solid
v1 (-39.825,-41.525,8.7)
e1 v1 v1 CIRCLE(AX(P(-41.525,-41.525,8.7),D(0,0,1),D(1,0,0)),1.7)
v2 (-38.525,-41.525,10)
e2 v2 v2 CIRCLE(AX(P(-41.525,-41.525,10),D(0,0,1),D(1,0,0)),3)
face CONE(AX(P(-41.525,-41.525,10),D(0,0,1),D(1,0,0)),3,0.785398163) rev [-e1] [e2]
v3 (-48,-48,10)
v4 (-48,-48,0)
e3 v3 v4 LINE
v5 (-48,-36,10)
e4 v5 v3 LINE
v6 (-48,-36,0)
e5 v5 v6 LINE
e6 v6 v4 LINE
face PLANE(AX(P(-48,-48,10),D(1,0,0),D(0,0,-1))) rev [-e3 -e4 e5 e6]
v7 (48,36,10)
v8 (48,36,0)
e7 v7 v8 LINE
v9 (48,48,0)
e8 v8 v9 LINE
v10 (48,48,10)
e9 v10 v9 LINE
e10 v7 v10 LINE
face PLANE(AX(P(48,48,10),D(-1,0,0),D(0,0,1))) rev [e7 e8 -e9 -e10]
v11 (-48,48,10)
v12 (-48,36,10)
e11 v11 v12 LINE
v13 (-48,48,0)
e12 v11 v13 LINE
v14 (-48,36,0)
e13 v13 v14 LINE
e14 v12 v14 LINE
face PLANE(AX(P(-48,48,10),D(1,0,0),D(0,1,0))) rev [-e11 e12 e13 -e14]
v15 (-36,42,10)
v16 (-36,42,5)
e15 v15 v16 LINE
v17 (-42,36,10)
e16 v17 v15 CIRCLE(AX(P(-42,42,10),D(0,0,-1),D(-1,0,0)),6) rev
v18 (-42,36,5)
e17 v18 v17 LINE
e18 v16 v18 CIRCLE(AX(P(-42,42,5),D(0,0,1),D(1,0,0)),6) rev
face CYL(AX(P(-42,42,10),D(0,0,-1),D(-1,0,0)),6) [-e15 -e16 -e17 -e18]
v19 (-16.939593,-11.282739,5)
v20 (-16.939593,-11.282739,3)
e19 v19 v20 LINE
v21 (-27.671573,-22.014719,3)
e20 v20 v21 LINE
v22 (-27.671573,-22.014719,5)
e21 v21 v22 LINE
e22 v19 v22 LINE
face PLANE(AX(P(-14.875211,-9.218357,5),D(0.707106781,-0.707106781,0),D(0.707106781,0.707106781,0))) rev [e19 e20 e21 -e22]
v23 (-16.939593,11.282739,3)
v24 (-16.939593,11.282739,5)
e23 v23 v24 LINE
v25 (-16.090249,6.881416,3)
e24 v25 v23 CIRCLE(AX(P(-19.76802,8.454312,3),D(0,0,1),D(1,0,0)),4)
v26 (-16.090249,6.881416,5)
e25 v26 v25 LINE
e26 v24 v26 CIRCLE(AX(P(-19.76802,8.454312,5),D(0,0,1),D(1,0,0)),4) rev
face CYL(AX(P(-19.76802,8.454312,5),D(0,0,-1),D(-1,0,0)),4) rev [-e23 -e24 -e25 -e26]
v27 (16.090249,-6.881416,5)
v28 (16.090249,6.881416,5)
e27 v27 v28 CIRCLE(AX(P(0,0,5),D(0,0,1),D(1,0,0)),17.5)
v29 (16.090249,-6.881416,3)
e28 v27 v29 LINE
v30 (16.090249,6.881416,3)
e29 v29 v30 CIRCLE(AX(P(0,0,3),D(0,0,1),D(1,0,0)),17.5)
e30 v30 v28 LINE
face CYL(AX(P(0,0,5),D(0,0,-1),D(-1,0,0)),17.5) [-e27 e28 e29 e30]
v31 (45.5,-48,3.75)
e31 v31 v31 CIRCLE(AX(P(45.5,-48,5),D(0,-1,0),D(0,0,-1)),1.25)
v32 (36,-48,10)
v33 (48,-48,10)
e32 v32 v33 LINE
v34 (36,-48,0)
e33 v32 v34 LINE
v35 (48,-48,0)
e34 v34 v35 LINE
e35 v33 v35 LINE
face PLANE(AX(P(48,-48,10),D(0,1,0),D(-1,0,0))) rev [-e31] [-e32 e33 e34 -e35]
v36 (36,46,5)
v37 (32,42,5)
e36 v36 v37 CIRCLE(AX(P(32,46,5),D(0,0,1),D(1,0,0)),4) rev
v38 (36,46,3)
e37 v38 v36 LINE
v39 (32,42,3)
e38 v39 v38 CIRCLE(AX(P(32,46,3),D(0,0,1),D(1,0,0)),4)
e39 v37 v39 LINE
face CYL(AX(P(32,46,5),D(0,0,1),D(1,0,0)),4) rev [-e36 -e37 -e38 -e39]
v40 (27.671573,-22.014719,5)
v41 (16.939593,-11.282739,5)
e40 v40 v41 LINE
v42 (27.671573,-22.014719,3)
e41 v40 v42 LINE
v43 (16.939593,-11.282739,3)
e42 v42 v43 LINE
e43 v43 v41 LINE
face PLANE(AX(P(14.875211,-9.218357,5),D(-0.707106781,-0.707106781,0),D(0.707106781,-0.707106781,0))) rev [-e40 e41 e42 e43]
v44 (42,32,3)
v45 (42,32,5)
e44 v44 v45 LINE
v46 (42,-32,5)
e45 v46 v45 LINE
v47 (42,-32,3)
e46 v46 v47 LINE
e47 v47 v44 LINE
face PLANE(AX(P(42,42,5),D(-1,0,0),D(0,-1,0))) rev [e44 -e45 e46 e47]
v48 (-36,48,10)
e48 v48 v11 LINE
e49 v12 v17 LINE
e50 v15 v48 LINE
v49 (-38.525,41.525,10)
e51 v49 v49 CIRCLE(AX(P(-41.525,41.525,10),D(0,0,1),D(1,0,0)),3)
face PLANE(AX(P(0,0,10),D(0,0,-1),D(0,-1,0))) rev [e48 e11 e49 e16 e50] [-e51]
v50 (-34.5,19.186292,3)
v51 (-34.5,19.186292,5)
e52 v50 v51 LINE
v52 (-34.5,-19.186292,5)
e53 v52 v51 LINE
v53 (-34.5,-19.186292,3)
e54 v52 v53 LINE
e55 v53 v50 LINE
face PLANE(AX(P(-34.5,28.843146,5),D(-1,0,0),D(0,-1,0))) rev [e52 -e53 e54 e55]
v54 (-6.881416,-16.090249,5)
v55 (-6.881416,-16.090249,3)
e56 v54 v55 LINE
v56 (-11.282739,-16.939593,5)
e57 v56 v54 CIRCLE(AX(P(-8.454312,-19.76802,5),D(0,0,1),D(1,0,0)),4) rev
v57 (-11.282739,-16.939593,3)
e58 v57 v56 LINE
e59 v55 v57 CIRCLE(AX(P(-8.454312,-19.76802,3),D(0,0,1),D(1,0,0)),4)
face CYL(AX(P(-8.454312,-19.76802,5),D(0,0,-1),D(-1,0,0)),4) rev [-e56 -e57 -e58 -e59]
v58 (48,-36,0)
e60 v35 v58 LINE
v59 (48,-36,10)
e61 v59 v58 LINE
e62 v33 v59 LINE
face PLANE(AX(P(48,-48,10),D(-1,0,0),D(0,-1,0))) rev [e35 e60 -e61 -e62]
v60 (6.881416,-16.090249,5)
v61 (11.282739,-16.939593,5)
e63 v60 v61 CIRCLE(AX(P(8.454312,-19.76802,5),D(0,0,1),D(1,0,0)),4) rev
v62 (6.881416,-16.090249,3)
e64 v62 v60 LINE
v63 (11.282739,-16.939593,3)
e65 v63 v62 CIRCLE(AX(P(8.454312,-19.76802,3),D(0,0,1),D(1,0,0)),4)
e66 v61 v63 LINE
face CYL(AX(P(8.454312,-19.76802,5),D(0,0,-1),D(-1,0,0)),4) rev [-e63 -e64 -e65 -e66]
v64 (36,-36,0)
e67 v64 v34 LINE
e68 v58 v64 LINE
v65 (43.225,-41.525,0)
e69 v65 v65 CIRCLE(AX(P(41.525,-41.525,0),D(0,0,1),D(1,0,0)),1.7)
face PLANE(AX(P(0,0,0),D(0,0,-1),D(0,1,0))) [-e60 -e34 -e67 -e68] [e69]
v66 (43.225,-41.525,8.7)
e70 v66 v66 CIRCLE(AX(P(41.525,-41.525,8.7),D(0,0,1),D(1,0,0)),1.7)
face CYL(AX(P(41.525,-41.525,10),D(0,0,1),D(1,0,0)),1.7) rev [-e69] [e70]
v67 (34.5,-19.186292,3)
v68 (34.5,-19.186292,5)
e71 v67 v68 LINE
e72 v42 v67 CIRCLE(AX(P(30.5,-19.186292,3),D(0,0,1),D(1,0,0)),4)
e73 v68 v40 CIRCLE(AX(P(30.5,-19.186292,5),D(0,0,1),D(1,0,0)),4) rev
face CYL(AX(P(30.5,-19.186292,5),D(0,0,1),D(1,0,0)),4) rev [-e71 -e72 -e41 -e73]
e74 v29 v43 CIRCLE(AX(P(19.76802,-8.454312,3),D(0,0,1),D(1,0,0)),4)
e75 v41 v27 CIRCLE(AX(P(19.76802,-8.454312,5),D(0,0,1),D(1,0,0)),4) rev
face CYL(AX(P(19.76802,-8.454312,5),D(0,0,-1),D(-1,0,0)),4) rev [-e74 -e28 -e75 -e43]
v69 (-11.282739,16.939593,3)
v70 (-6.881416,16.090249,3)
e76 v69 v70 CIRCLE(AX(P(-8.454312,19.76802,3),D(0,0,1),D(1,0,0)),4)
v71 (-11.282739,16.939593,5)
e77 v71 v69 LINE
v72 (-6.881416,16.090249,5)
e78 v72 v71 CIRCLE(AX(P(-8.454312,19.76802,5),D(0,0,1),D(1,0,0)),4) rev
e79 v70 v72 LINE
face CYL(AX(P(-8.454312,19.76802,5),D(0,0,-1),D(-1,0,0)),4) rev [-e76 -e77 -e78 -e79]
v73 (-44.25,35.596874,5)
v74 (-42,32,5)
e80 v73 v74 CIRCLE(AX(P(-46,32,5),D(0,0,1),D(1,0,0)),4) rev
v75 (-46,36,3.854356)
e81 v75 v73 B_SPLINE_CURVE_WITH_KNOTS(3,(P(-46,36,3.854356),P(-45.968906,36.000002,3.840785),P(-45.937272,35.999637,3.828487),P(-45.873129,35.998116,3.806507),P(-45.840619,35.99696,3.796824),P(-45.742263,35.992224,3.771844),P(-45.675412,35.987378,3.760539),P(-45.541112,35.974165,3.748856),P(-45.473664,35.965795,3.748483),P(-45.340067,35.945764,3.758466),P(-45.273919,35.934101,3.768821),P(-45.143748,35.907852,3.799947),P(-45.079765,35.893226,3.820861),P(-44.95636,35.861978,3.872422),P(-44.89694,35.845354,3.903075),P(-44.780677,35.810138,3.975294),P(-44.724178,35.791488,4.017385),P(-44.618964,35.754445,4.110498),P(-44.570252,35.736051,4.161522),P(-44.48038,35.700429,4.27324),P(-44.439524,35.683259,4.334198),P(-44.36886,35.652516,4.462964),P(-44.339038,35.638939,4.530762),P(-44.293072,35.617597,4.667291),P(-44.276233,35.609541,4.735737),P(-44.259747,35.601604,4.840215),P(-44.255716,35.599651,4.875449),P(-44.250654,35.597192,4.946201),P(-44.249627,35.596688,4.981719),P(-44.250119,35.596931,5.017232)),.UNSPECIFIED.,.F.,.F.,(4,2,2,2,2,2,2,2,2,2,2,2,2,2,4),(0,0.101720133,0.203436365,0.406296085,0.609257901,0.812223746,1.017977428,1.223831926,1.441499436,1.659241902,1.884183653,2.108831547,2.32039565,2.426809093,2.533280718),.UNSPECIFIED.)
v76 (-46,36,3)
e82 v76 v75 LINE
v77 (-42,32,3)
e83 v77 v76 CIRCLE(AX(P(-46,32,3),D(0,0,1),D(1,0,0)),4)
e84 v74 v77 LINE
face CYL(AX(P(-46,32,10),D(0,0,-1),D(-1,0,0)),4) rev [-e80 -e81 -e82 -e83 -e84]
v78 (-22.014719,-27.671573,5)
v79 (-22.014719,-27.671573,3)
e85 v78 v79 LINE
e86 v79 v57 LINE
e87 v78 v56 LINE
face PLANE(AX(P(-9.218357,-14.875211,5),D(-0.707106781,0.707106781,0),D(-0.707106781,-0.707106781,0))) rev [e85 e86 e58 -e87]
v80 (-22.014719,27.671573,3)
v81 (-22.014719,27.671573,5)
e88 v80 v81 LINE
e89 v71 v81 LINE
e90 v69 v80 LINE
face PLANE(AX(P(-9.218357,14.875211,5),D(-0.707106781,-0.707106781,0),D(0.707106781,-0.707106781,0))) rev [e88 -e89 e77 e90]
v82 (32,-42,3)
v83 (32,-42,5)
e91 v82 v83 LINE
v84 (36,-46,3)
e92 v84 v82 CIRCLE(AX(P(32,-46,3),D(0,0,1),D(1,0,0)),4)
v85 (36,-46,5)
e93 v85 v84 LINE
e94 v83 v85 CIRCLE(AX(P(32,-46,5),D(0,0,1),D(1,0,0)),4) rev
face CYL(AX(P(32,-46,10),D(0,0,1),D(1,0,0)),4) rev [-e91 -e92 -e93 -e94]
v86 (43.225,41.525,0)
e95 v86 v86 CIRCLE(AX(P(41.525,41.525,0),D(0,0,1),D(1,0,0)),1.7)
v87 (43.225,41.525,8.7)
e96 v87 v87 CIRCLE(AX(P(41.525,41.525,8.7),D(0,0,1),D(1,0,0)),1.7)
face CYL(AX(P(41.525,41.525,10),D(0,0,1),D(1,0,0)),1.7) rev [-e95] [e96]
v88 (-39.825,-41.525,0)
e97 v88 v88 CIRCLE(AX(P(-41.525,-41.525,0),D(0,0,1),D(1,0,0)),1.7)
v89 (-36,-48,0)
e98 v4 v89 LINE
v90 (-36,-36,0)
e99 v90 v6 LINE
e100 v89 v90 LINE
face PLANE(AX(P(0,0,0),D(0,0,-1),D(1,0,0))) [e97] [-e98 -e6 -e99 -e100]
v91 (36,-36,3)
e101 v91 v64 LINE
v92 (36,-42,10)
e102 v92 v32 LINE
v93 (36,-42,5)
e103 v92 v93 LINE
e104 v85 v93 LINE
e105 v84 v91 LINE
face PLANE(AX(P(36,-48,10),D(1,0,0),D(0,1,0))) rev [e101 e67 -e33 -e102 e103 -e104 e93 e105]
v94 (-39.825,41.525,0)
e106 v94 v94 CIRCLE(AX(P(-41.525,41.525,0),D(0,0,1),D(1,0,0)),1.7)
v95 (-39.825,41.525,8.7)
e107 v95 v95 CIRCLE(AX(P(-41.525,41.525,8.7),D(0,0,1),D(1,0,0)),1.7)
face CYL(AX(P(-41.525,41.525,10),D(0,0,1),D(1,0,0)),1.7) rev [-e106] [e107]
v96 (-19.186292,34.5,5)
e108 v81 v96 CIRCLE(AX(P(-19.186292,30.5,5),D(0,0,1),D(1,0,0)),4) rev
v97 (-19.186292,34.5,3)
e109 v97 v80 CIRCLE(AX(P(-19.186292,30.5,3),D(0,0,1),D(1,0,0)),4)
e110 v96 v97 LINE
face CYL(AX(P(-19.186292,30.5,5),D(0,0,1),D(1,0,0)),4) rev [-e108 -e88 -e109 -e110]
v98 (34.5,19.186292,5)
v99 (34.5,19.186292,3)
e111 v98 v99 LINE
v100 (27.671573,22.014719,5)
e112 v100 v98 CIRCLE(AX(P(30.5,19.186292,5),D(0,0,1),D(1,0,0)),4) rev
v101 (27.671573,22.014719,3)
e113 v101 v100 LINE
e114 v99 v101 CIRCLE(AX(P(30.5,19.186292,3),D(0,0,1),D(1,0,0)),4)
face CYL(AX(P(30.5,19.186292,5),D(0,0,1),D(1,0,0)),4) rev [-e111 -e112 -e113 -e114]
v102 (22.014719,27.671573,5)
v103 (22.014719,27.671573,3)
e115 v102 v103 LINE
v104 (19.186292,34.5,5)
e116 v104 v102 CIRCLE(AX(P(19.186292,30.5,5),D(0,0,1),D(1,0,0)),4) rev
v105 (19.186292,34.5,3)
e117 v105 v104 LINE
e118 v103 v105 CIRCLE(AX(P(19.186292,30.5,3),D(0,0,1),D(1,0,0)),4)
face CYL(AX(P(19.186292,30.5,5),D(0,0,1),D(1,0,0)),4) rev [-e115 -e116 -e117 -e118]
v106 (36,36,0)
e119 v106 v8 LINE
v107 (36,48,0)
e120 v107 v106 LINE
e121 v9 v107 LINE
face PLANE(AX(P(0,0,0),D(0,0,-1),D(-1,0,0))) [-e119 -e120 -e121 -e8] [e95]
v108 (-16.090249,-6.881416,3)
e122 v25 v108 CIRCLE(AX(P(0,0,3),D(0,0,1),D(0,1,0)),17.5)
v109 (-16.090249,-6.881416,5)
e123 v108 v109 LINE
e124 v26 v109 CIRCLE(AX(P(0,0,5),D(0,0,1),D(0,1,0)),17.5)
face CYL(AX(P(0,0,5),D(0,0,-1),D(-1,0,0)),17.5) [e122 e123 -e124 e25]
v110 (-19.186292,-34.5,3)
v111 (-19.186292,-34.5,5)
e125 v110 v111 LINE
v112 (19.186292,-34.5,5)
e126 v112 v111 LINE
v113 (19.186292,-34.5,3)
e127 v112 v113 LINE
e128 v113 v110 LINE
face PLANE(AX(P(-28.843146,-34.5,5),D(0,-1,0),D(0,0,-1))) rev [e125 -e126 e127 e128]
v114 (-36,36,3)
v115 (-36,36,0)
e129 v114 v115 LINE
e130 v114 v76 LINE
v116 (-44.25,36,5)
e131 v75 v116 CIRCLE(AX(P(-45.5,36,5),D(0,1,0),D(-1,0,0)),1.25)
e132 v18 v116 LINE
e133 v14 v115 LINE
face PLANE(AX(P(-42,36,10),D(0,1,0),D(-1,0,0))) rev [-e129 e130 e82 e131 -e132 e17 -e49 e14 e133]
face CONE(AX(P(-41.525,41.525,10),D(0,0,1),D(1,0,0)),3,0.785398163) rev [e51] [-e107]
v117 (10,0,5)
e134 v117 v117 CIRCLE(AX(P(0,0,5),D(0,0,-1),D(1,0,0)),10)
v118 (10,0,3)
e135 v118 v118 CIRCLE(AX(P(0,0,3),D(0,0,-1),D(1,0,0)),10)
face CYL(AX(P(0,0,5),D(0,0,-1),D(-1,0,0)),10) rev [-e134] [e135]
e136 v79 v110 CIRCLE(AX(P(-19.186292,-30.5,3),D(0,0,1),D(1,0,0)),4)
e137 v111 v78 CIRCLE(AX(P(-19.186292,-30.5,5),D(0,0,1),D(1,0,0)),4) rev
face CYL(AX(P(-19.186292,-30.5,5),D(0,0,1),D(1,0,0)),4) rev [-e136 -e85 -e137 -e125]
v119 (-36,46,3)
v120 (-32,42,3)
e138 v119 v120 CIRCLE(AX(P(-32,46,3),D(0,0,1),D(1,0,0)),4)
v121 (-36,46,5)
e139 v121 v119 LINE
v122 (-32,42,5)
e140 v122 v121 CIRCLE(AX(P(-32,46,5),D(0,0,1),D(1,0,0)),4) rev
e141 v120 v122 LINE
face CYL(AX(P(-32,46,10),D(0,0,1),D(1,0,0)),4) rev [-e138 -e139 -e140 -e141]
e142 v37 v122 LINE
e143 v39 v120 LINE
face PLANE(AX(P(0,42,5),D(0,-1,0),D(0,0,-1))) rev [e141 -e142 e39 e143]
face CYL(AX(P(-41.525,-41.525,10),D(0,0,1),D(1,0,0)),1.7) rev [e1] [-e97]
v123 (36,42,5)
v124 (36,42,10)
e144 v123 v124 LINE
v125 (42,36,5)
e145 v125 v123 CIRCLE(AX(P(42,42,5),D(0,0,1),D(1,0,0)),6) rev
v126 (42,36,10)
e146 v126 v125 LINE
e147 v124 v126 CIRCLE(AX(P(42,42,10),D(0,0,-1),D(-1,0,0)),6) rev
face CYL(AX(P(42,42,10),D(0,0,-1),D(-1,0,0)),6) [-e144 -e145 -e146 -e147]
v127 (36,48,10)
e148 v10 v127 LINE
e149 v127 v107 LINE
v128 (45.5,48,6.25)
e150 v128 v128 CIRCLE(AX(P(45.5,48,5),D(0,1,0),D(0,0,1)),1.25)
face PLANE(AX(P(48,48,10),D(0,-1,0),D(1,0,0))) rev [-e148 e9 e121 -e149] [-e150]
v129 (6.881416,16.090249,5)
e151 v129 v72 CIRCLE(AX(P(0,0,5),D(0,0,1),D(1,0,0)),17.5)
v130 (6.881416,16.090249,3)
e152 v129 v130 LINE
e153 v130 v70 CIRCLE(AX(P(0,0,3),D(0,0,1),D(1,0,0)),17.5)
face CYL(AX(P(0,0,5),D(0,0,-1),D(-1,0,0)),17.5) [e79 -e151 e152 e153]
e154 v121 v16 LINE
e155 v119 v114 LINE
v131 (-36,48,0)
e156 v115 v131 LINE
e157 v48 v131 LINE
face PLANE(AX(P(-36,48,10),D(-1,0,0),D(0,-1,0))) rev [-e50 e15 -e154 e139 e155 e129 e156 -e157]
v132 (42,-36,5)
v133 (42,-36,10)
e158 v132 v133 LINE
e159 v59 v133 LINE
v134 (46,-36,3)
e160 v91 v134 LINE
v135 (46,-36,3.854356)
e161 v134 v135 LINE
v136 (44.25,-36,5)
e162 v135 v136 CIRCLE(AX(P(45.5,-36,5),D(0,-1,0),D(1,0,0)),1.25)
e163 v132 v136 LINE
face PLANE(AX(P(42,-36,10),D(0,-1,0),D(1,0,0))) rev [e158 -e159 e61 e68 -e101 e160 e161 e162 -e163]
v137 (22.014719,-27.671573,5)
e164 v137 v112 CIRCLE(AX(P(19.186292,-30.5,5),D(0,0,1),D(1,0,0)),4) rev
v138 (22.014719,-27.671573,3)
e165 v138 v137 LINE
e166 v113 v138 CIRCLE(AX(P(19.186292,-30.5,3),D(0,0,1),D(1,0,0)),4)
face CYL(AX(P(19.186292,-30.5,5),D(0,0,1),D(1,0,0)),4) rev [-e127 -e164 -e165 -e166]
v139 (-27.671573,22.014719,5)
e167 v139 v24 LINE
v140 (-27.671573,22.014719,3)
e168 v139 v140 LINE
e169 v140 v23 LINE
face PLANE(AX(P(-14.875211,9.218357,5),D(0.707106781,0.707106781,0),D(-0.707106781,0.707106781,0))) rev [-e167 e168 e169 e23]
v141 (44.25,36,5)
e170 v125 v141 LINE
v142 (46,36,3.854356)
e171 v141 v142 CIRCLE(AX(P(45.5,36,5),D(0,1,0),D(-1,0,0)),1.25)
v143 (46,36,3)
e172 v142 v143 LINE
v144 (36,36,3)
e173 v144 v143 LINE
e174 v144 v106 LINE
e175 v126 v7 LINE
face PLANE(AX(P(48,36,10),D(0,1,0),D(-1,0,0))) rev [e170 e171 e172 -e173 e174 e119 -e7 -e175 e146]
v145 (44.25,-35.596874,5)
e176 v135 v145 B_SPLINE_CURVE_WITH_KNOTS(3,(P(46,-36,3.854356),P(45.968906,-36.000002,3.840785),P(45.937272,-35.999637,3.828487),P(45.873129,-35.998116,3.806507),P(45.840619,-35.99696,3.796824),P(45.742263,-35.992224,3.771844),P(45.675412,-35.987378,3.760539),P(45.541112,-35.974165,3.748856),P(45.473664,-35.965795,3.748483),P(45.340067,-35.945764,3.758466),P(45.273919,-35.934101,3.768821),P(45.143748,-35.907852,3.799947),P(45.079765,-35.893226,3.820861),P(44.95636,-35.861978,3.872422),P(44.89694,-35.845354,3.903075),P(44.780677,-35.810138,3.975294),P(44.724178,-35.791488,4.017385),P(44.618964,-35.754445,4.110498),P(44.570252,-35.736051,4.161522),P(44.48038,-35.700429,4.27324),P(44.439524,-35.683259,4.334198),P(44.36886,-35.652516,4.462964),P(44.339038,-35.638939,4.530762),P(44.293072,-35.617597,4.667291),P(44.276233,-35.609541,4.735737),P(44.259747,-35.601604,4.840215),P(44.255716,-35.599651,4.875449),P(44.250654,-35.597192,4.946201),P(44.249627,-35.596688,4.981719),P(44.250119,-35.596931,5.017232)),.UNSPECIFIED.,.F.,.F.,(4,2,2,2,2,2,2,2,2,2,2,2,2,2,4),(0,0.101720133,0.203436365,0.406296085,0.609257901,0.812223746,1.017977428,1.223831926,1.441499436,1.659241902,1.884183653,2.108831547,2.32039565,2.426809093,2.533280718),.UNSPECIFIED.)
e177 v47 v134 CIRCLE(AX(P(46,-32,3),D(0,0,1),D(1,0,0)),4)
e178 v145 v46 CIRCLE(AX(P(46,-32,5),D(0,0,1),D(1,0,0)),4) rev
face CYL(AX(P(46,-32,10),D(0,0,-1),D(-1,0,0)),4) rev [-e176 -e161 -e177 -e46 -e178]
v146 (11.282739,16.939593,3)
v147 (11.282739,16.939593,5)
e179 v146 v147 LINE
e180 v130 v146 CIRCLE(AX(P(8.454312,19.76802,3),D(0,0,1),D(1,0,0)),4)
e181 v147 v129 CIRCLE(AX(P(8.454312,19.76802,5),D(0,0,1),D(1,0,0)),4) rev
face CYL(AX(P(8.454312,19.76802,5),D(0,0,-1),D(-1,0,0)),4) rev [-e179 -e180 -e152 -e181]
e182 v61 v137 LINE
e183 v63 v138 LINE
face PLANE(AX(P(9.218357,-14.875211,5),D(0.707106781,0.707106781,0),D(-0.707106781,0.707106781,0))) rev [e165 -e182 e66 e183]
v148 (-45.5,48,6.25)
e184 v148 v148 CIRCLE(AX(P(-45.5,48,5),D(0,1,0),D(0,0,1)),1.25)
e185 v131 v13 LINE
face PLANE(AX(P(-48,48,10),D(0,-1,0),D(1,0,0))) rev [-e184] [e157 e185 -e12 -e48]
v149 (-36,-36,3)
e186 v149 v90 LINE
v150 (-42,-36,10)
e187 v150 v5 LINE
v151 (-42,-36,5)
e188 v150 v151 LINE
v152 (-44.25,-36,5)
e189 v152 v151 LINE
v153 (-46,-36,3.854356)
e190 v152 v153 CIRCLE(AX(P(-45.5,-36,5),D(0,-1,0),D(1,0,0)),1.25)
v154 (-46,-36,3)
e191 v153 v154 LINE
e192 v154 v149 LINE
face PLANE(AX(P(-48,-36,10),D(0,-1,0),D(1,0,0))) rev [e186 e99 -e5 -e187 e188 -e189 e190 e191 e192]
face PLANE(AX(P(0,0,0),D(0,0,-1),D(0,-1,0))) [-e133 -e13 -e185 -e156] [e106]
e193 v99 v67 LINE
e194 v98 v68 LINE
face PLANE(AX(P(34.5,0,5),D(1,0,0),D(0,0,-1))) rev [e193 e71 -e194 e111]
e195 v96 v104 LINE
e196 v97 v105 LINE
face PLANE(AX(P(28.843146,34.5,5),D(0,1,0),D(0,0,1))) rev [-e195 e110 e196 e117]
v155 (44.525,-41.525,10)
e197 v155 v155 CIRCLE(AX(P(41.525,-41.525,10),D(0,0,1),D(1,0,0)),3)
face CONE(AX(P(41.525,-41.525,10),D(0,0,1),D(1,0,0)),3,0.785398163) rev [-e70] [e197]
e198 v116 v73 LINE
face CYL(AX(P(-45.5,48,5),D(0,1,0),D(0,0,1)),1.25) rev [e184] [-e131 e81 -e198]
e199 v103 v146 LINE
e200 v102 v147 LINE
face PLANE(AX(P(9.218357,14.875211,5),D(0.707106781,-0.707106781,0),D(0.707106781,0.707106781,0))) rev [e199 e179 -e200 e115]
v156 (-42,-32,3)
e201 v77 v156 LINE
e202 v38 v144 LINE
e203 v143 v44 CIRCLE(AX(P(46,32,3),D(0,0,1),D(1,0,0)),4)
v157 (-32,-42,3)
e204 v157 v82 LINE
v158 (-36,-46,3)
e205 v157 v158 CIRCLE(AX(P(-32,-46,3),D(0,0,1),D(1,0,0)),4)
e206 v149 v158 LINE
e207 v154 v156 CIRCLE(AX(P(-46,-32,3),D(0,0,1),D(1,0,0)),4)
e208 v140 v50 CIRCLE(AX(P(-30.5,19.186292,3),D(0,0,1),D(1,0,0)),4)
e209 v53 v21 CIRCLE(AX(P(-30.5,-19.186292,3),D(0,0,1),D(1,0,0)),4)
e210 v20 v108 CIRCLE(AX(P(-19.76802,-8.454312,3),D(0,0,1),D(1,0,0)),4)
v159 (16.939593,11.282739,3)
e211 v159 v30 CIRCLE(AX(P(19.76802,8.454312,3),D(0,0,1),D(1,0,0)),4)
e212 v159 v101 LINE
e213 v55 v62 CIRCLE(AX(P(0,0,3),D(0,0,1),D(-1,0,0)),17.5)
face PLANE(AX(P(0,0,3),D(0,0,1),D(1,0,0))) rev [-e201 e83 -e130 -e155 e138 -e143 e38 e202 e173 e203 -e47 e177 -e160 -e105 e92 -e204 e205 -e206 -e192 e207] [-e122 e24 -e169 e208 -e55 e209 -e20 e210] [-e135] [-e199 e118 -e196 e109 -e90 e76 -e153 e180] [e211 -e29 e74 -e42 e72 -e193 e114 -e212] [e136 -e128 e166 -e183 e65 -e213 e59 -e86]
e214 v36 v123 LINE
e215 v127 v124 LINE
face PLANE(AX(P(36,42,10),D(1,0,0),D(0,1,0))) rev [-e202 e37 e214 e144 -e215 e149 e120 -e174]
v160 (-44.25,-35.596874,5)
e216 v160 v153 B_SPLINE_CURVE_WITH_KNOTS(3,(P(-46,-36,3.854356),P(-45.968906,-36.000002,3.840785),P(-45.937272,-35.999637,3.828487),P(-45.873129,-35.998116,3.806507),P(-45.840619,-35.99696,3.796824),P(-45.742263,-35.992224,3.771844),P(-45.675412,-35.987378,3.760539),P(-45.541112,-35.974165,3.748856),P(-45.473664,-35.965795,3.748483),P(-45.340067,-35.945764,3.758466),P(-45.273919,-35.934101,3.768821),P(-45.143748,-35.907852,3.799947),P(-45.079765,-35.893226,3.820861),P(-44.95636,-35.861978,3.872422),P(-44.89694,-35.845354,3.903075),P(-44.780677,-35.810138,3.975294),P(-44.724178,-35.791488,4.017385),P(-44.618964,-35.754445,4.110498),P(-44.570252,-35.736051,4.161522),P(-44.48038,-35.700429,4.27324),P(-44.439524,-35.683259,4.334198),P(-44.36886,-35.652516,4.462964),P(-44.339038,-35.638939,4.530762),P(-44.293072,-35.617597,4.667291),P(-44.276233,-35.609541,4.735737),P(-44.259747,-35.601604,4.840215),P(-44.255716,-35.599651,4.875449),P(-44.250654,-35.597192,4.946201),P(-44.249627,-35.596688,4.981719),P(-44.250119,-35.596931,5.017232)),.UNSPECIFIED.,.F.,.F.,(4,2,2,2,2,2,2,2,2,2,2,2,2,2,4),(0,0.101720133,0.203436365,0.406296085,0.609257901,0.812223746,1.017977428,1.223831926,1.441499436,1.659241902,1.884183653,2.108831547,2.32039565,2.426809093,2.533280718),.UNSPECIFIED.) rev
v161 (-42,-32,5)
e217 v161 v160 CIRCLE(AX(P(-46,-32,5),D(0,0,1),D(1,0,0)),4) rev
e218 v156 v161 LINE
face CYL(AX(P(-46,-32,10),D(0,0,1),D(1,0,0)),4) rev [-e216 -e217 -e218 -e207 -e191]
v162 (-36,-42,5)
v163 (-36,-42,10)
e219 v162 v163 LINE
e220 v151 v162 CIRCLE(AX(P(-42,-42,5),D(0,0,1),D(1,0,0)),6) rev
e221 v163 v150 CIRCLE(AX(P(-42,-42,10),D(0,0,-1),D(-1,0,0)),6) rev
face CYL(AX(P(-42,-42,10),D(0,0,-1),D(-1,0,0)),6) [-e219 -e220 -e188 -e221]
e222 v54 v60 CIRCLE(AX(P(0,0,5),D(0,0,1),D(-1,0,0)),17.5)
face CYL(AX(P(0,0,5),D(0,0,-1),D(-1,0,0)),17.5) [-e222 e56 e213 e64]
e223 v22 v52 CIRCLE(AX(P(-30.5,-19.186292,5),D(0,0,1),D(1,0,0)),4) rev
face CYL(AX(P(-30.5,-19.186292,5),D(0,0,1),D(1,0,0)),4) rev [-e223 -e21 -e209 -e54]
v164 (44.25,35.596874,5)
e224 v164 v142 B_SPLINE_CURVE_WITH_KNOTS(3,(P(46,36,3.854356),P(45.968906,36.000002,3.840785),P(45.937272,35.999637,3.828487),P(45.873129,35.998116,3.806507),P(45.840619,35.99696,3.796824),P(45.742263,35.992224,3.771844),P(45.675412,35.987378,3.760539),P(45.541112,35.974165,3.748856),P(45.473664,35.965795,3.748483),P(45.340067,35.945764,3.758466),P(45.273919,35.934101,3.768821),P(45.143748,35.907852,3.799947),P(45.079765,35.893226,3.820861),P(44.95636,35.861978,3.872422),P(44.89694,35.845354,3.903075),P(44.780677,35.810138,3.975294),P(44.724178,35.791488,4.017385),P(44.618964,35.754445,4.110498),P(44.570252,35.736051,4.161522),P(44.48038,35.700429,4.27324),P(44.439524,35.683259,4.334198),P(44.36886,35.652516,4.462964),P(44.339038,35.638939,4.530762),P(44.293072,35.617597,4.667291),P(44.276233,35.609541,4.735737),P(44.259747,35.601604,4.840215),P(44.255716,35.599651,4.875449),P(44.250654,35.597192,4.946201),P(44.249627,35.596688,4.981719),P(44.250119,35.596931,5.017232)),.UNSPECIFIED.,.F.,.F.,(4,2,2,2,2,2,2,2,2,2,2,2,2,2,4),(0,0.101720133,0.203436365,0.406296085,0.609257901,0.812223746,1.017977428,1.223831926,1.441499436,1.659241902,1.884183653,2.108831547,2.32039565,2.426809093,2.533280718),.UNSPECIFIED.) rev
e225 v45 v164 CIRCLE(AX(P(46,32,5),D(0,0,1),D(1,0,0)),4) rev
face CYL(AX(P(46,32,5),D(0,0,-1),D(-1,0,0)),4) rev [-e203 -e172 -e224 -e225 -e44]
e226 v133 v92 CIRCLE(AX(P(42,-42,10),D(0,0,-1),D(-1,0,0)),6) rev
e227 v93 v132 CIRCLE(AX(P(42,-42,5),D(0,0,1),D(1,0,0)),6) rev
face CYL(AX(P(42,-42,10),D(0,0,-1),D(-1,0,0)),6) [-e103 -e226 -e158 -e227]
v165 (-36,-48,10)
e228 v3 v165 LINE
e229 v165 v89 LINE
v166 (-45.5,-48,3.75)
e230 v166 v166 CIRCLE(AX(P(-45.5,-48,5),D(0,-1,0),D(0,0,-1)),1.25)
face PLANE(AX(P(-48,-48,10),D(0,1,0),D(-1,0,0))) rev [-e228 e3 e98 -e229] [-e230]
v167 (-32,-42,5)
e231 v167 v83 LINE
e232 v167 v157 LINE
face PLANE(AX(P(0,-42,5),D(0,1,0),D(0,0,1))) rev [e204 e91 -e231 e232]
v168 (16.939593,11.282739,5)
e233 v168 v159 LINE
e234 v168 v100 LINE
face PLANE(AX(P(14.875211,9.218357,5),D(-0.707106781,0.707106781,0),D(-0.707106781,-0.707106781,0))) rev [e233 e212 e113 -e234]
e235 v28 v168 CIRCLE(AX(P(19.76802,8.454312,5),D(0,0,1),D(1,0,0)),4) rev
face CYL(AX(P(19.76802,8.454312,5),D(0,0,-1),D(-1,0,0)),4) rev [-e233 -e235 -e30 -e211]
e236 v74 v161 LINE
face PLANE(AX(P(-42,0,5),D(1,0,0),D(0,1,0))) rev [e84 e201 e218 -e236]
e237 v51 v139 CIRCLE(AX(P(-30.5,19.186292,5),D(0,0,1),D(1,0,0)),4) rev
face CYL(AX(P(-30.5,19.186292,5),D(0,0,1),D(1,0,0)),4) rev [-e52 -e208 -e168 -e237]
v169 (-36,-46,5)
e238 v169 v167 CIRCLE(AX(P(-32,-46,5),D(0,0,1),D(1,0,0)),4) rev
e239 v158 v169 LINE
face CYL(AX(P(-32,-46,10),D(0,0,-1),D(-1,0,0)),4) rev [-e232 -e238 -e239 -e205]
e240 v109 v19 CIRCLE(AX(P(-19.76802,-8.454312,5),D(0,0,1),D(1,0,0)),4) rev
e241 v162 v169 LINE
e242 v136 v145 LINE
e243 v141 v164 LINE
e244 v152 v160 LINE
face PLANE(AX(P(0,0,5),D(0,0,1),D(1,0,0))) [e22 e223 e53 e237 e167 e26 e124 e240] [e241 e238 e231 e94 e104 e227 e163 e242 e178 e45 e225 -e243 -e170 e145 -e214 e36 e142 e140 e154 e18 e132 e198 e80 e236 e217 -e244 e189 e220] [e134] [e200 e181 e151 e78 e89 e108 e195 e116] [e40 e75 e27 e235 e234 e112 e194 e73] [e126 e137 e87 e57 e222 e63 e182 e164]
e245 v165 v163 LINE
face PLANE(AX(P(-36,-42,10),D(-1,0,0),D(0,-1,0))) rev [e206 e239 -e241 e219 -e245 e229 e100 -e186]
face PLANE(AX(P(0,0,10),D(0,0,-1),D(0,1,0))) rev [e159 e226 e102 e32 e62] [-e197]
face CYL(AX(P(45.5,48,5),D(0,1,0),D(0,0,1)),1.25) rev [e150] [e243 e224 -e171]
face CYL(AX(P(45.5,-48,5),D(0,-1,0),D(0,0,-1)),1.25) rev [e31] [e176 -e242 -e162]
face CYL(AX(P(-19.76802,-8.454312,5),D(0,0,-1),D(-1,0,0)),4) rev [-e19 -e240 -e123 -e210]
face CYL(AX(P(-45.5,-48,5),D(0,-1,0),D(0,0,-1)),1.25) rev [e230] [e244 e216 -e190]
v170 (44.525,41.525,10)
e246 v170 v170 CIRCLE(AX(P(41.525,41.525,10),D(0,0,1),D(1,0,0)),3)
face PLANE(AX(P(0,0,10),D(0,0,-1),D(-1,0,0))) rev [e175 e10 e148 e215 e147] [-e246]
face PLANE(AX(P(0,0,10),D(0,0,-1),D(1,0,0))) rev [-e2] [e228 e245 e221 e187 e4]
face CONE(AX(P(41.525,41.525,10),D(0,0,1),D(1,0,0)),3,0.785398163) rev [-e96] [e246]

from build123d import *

# Parameters (mm, degrees)
BOTTOMLAYER_DEPTH              = 10
BOSS_EXTRUDE1_DEPTH            = 2
M3_CLEARANCE_HOLE1_D           = 3.4
M3_CLEARANCE_HOLE1_CSINK_D     = 6
M3_CLEARANCE_HOLE1_CSINK_ANGLE = 90
TAP_DRILL_FOR_M3_TAP1_D        = 2.5
CIRPATTERN2_COUNT              = 4
CIRPATTERN3_OUTLINE_R          = 1.7
CIRPATTERN3_DEPTH              = 8.6999999
CIRPATTERN3_2_OUTLINE_W        = 12
CIRPATTERN3_2_OUTLINE_H        = 12
CIRPATTERN3_2_OUTLINE_R        = 1.7
CIRPATTERN3_2_DEPTH            = 8.6999999
CIRPATTERN3_START              = -48
CIRPATTERN3_3_OUTLINE_W        = 12
CIRPATTERN3_3_OUTLINE_H        = 1.3000001
CIRPATTERN3_3_DEPTH            = 12
CIRPATTERN3_START_2            = 36
CIRPATTERN3_4_OUTLINE_W        = 12
CIRPATTERN3_4_OUTLINE_H        = 1.3000001
CIRPATTERN3_4_DEPTH            = 12
FILLET1_R                      = 4
TAP_DRILL_FOR_M3_TAP2_D        = 2.5
TAP_DRILL_FOR_M3_TAP2_DEPTH    = 12
FILLET2_R                      = 4
FILLET3_R                      = 6


with BuildPart() as part:
    # Sketch3 → BottomLayer (new body)
    with BuildSketch(Plane.XY):
        Polygon((48, 48), (36, 48), (36, 42), (36, 36), (42, 36), (48, 36), align=None)
    extrude(amount=BOTTOMLAYER_DEPTH)

    # Sketch30 → Boss-Extrude1 (add)
    with BuildSketch(Plane.XY.offset(3)):
        with BuildLine():
            Line((0, 42), (42, 42))
            Line((42, 42), (42, 0))
            Line((42, 0), (34.5, 0))
            Line((34.5, 0), (34.5, 28.843145751))
            Line((34.5, 28.843145751), (14.875210928, 9.218356678))
            ThreePointArc((14.875210928, 9.218356678), (16.831015882, 4.792379824), (17.5, 0))
            Line((17.5, 0), (10, 0))
            ThreePointArc((10, 0), (7.071067812, 7.071067812), (0, 10))
            Line((0, 10), (0, 17.5))
            ThreePointArc((0, 17.5), (4.792379824, 16.831015882), (9.218356678, 14.875210928))
            Line((9.218356678, 14.875210928), (28.843145751, 34.5))
            Line((28.843145751, 34.5), (0, 34.5))
            Line((0, 34.5), (0, 42))
        make_face()
    boss_extrude1 = extrude(amount=BOSS_EXTRUDE1_DEPTH)

    # M3 Clearance Hole1 (through all)
    with Locations(Plane.XY.offset(10)):
        with Locations((41.525, 41.525)):
            CounterSinkHole(M3_CLEARANCE_HOLE1_D / 2, M3_CLEARANCE_HOLE1_CSINK_D / 2, counter_sink_angle=M3_CLEARANCE_HOLE1_CSINK_ANGLE)

    # Tap Drill for M3 Tap1 (through all)
    with Locations(Plane(origin=(0, 48, 0), x_dir=(1, 0, 0), z_dir=(0, 1, 0))):
        with Locations((45.5, -5)):
            tap_drill_for_m3_tap1 = Hole(TAP_DRILL_FOR_M3_TAP1_D / 2)

    # CirPattern2: Boss-Extrude1 ×4 about axis
    cirpattern2_axis = Axis((0, 0, 0), (0, 0, 1))
    for i in range(1, CIRPATTERN2_COUNT):
        add(boss_extrude1.rotate(cirpattern2_axis, i * 360 / CIRPATTERN2_COUNT))

    # CirPattern3: read off the stored shape, not the designer's step
    # CirPattern3 outline → CirPattern3 (cut)
    with BuildSketch(Plane.XY):
        with Locations((-41.525, 41.525)):
            Circle(CIRPATTERN3_OUTLINE_R)
        with Locations((-41.525, -41.525)):
            Circle(CIRPATTERN3_OUTLINE_R)
        with Locations((41.525, -41.525)):
            Circle(CIRPATTERN3_OUTLINE_R)
    extrude(amount=CIRPATTERN3_DEPTH, mode=Mode.SUBTRACT)

    # CirPattern3 2 outline → CirPattern3 2 (add)
    # profile 1 of 3: a face of its own
    with BuildSketch(Plane.XY):
        with Locations((-42, 42)):
            Rectangle(CIRPATTERN3_2_OUTLINE_W, CIRPATTERN3_2_OUTLINE_H)
        with Locations((-41.525, 41.525)):
            Circle(CIRPATTERN3_2_OUTLINE_R, mode=Mode.SUBTRACT)
    # profile 2 of 3: a face of its own
    with BuildSketch(Plane.XY):
        with Locations((42, -42)):
            Rectangle(CIRPATTERN3_2_OUTLINE_W, CIRPATTERN3_2_OUTLINE_H)
        with Locations((41.525, -41.525)):
            Circle(CIRPATTERN3_2_OUTLINE_R, mode=Mode.SUBTRACT)
    # profile 3 of 3: a face of its own
    with BuildSketch(Plane.XY):
        with Locations((-42, -42)):
            Rectangle(CIRPATTERN3_2_OUTLINE_W, CIRPATTERN3_2_OUTLINE_H)
        with Locations((-41.525, -41.525)):
            Circle(CIRPATTERN3_2_OUTLINE_R, mode=Mode.SUBTRACT)
    extrude(amount=CIRPATTERN3_2_DEPTH)

    # CirPattern3 3 outline → CirPattern3 3 (add)
    with BuildSketch(Plane(origin=(0, 0, 0), x_dir=(1, 0, 0), z_dir=(0, 1, 0)).offset(CIRPATTERN3_START)):
        with Locations((42, -9.34999995)):
            Rectangle(CIRPATTERN3_3_OUTLINE_W, CIRPATTERN3_3_OUTLINE_H)
        with Locations((-42, -9.34999995)):
            Rectangle(CIRPATTERN3_3_OUTLINE_W, CIRPATTERN3_3_OUTLINE_H)
    extrude(amount=CIRPATTERN3_3_DEPTH)

    # CirPattern3 4 outline → CirPattern3 4 (add)
    with BuildSketch(Plane(origin=(0, 0, 0), x_dir=(1, 0, 0), z_dir=(0, 1, 0)).offset(CIRPATTERN3_START_2)):
        with Locations((-42, -9.34999995)):
            Rectangle(CIRPATTERN3_4_OUTLINE_W, CIRPATTERN3_4_OUTLINE_H)
    extrude(amount=CIRPATTERN3_4_DEPTH)

    # CirPattern3 5: loft between two sections, ruled curve by curve
    cirpattern3_5_from = [
        Edge.make_three_point_arc((-39.825, 41.525, 8.7), (-41.525, 43.225, 8.7), (-43.225, 41.525, 8.7)),
        Edge.make_three_point_arc((-43.225, 41.525, 8.7), (-41.525, 39.825, 8.7), (-39.825, 41.525, 8.7)),
    ]
    cirpattern3_5_to = [
        Edge.make_three_point_arc((-38.525, 41.525, 10), (-41.525, 44.525, 10), (-44.525, 41.525, 10)),
        Edge.make_three_point_arc((-44.525, 41.525, 10), (-41.525, 38.525, 10), (-38.525, 41.525, 10)),
    ]
    cirpattern3_5 = Solid(Shell([*[Face.make_surface_from_curves(cirpattern3_5_from[k], cirpattern3_5_to[k]) for k in range(2)], Face(Wire(cirpattern3_5_from)), Face(Wire(cirpattern3_5_to))]))
    add(cirpattern3_5, mode=Mode.SUBTRACT)

    # CirPattern3 6: loft between two sections, ruled curve by curve
    cirpattern3_6_from = [
        Edge.make_three_point_arc((-39.825, -41.525, 8.7), (-41.525, -39.825, 8.7), (-43.225, -41.525, 8.7)),
        Edge.make_three_point_arc((-43.225, -41.525, 8.7), (-41.525, -43.225, 8.7), (-39.825, -41.525, 8.7)),
    ]
    cirpattern3_6_to = [
        Edge.make_three_point_arc((-38.525, -41.525, 10), (-41.525, -38.525, 10), (-44.525, -41.525, 10)),
        Edge.make_three_point_arc((-44.525, -41.525, 10), (-41.525, -44.525, 10), (-38.525, -41.525, 10)),
    ]
    cirpattern3_6 = Solid(Shell([*[Face.make_surface_from_curves(cirpattern3_6_from[k], cirpattern3_6_to[k]) for k in range(2)], Face(Wire(cirpattern3_6_from)), Face(Wire(cirpattern3_6_to))]))
    add(cirpattern3_6, mode=Mode.SUBTRACT)

    # CirPattern3 7: loft between two sections, ruled curve by curve
    cirpattern3_7_from = [
        Edge.make_three_point_arc((43.225, -41.525, 8.7), (41.525, -39.825, 8.7), (39.825, -41.525, 8.7)),
        Edge.make_three_point_arc((39.825, -41.525, 8.7), (41.525, -43.225, 8.7), (43.225, -41.525, 8.7)),
    ]
    cirpattern3_7_to = [
        Edge.make_three_point_arc((44.525, -41.525, 10), (41.525, -38.525, 10), (38.525, -41.525, 10)),
        Edge.make_three_point_arc((38.525, -41.525, 10), (41.525, -44.525, 10), (44.525, -41.525, 10)),
    ]
    cirpattern3_7 = Solid(Shell([*[Face.make_surface_from_curves(cirpattern3_7_from[k], cirpattern3_7_to[k]) for k in range(2)], Face(Wire(cirpattern3_7_from)), Face(Wire(cirpattern3_7_to))]))
    add(cirpattern3_7, mode=Mode.SUBTRACT)

    # Fillet1
    fillet1_edges = [part.edges().sort_by_distance(p)[0] for p in [
        (28.843145751, 34.5, 4),
        (9.218356678, 14.875210928, 4),
        (14.875210928, 9.218356678, 4),
        (34.5, 28.843145751, 4),
        (-34.5, -28.843145751, 4),
        (-34.5, 28.843145751, 4),
        (-14.875210928, 9.218356678, 4),
        (-9.218356678, 14.875210928, 4),
        (-28.843145751, 34.5, 4),
        (28.843145751, -34.5, 4),
        (-28.843145751, -34.5, 4),
        (-9.218356678, -14.875210928, 4),
        (-14.875210928, -9.218356678, 4),
        (34.5, -28.843145751, 4),
        (14.875210928, -9.218356678, 4),
        (9.218356678, -14.875210928, 4),
    ]]
    fillet(fillet1_edges, radius=FILLET1_R)

    # Tap Drill for M3 Tap2
    with Locations(Plane(origin=(0, 48, 0), x_dir=(1, 0, 0), z_dir=(0, 1, 0))):
        with Locations((-45.5, -5)):
            tap_drill_for_m3_tap2 = Hole(TAP_DRILL_FOR_M3_TAP2_D / 2, depth=TAP_DRILL_FOR_M3_TAP2_DEPTH)

    # Mirror1: Tap Drill for M3 Tap1, Tap Drill for M3 Tap2 across plane
    add(tap_drill_for_m3_tap1.mirror(Plane.ZX), mode=Mode.SUBTRACT)
    add(tap_drill_for_m3_tap2.mirror(Plane.ZX), mode=Mode.SUBTRACT)

    # Fillet2
    # the kernel refuses this fillet: 4 mm, written as the material it adds along each edge
    with BuildSketch(Plane(origin=(-42, 36, 5), x_dir=(-1, 0, 0), z_dir=(0, 0, -1))) as fillet2_piece_1_section:
        with BuildLine():
            CenterArc((FILLET2_R, -FILLET2_R), FILLET2_R, 90, 90)
            Line((0, -FILLET2_R), (0, 0))
            Line((0, 0), (FILLET2_R, 0))
        make_face()
    fillet2_piece_1 = extrude(amount=2, mode=Mode.PRIVATE)
    fillet2_piece_1 = fillet2_piece_1 - Plane(origin=(-45.5, 36, 5), x_dir=(-1, 0, 0), z_dir=(0, -1, 0)) * Cylinder(1.25, 20, mode=Mode.PRIVATE)
    add(fillet2_piece_1)
    with BuildSketch(Plane(origin=(-36, 42, 3), x_dir=(1, 0, 0), z_dir=(0, 0, 1)), Plane(origin=(-36, -42, 5), x_dir=(1, 0, 0), z_dir=(0, 0, -1)), Plane(origin=(36, -42, 3), x_dir=(-1, 0, 0), z_dir=(0, 0, 1))) as fillet2_piece_2:
        with BuildLine():
            CenterArc((FILLET2_R, FILLET2_R), FILLET2_R, 180, 90)
            Line((0, FILLET2_R), (0, 0))
            Line((0, 0), (FILLET2_R, 0))
        make_face()
    extrude(amount=2)
    with BuildSketch(Plane(origin=(-42, -36, 3), x_dir=(0, 1, 0), z_dir=(0, 0, 1))) as fillet2_piece_3_section:
        with BuildLine():
            CenterArc((FILLET2_R, FILLET2_R), FILLET2_R, 180, 90)
            Line((0, FILLET2_R), (0, 0))
            Line((0, 0), (FILLET2_R, 0))
        make_face()
    fillet2_piece_3 = extrude(amount=2, mode=Mode.PRIVATE)
    fillet2_piece_3 = fillet2_piece_3 - Plane(origin=(-45.5, -36, 5), x_dir=(-1, 0, 0), z_dir=(0, 1, 0)) * Cylinder(1.25, 20, mode=Mode.PRIVATE)
    add(fillet2_piece_3)
    with BuildSketch(Plane(origin=(42, -36, 5), x_dir=(1, 0, 0), z_dir=(0, 0, -1))) as fillet2_piece_4_section:
        with BuildLine():
            CenterArc((FILLET2_R, -FILLET2_R), FILLET2_R, 90, 90)
            Line((0, -FILLET2_R), (0, 0))
            Line((0, 0), (FILLET2_R, 0))
        make_face()
    fillet2_piece_4 = extrude(amount=2, mode=Mode.PRIVATE)
    fillet2_piece_4 = fillet2_piece_4 - Plane(origin=(45.5, -36, 5), x_dir=(-1, 0, 0), z_dir=(0, 1, 0)) * Cylinder(1.25, 20, mode=Mode.PRIVATE)
    add(fillet2_piece_4)
    with BuildSketch(Plane(origin=(42, 36, 5), x_dir=(0, -1, 0), z_dir=(0, 0, -1))) as fillet2_piece_5_section:
        with BuildLine():
            CenterArc((FILLET2_R, -FILLET2_R), FILLET2_R, 90, 90)
            Line((0, -FILLET2_R), (0, 0))
            Line((0, 0), (FILLET2_R, 0))
        make_face()
    fillet2_piece_5 = extrude(amount=2, mode=Mode.PRIVATE)
    fillet2_piece_5 = fillet2_piece_5 - Plane(origin=(45.5, 36, 5), x_dir=(-1, 0, 0), z_dir=(0, -1, 0)) * Cylinder(1.25, 20, mode=Mode.PRIVATE)
    add(fillet2_piece_5)
    with BuildSketch(Plane(origin=(36, 42, 3), x_dir=(-1, 0, 0), z_dir=(0, 0, 1))) as fillet2_piece_6:
        with BuildLine():
            CenterArc((FILLET2_R, -FILLET2_R), FILLET2_R, 90, 90)
            Line((0, -FILLET2_R), (0, 0))
            Line((0, 0), (FILLET2_R, 0))
        make_face()
    extrude(amount=2)

    # Fillet3
    fillet3_edges = [part.edges().sort_by_distance(p)[0] for p in [
        (36, 36, 7.5),
        (-36, 36, 7.5),
        (-36, -36, 7.5),
        (36, -36, 7.5),
    ]]
    fillet(fillet3_edges, radius=FILLET3_R - 0.0001)  # a hair under: the kernel refuses the full size


solid = part.part
